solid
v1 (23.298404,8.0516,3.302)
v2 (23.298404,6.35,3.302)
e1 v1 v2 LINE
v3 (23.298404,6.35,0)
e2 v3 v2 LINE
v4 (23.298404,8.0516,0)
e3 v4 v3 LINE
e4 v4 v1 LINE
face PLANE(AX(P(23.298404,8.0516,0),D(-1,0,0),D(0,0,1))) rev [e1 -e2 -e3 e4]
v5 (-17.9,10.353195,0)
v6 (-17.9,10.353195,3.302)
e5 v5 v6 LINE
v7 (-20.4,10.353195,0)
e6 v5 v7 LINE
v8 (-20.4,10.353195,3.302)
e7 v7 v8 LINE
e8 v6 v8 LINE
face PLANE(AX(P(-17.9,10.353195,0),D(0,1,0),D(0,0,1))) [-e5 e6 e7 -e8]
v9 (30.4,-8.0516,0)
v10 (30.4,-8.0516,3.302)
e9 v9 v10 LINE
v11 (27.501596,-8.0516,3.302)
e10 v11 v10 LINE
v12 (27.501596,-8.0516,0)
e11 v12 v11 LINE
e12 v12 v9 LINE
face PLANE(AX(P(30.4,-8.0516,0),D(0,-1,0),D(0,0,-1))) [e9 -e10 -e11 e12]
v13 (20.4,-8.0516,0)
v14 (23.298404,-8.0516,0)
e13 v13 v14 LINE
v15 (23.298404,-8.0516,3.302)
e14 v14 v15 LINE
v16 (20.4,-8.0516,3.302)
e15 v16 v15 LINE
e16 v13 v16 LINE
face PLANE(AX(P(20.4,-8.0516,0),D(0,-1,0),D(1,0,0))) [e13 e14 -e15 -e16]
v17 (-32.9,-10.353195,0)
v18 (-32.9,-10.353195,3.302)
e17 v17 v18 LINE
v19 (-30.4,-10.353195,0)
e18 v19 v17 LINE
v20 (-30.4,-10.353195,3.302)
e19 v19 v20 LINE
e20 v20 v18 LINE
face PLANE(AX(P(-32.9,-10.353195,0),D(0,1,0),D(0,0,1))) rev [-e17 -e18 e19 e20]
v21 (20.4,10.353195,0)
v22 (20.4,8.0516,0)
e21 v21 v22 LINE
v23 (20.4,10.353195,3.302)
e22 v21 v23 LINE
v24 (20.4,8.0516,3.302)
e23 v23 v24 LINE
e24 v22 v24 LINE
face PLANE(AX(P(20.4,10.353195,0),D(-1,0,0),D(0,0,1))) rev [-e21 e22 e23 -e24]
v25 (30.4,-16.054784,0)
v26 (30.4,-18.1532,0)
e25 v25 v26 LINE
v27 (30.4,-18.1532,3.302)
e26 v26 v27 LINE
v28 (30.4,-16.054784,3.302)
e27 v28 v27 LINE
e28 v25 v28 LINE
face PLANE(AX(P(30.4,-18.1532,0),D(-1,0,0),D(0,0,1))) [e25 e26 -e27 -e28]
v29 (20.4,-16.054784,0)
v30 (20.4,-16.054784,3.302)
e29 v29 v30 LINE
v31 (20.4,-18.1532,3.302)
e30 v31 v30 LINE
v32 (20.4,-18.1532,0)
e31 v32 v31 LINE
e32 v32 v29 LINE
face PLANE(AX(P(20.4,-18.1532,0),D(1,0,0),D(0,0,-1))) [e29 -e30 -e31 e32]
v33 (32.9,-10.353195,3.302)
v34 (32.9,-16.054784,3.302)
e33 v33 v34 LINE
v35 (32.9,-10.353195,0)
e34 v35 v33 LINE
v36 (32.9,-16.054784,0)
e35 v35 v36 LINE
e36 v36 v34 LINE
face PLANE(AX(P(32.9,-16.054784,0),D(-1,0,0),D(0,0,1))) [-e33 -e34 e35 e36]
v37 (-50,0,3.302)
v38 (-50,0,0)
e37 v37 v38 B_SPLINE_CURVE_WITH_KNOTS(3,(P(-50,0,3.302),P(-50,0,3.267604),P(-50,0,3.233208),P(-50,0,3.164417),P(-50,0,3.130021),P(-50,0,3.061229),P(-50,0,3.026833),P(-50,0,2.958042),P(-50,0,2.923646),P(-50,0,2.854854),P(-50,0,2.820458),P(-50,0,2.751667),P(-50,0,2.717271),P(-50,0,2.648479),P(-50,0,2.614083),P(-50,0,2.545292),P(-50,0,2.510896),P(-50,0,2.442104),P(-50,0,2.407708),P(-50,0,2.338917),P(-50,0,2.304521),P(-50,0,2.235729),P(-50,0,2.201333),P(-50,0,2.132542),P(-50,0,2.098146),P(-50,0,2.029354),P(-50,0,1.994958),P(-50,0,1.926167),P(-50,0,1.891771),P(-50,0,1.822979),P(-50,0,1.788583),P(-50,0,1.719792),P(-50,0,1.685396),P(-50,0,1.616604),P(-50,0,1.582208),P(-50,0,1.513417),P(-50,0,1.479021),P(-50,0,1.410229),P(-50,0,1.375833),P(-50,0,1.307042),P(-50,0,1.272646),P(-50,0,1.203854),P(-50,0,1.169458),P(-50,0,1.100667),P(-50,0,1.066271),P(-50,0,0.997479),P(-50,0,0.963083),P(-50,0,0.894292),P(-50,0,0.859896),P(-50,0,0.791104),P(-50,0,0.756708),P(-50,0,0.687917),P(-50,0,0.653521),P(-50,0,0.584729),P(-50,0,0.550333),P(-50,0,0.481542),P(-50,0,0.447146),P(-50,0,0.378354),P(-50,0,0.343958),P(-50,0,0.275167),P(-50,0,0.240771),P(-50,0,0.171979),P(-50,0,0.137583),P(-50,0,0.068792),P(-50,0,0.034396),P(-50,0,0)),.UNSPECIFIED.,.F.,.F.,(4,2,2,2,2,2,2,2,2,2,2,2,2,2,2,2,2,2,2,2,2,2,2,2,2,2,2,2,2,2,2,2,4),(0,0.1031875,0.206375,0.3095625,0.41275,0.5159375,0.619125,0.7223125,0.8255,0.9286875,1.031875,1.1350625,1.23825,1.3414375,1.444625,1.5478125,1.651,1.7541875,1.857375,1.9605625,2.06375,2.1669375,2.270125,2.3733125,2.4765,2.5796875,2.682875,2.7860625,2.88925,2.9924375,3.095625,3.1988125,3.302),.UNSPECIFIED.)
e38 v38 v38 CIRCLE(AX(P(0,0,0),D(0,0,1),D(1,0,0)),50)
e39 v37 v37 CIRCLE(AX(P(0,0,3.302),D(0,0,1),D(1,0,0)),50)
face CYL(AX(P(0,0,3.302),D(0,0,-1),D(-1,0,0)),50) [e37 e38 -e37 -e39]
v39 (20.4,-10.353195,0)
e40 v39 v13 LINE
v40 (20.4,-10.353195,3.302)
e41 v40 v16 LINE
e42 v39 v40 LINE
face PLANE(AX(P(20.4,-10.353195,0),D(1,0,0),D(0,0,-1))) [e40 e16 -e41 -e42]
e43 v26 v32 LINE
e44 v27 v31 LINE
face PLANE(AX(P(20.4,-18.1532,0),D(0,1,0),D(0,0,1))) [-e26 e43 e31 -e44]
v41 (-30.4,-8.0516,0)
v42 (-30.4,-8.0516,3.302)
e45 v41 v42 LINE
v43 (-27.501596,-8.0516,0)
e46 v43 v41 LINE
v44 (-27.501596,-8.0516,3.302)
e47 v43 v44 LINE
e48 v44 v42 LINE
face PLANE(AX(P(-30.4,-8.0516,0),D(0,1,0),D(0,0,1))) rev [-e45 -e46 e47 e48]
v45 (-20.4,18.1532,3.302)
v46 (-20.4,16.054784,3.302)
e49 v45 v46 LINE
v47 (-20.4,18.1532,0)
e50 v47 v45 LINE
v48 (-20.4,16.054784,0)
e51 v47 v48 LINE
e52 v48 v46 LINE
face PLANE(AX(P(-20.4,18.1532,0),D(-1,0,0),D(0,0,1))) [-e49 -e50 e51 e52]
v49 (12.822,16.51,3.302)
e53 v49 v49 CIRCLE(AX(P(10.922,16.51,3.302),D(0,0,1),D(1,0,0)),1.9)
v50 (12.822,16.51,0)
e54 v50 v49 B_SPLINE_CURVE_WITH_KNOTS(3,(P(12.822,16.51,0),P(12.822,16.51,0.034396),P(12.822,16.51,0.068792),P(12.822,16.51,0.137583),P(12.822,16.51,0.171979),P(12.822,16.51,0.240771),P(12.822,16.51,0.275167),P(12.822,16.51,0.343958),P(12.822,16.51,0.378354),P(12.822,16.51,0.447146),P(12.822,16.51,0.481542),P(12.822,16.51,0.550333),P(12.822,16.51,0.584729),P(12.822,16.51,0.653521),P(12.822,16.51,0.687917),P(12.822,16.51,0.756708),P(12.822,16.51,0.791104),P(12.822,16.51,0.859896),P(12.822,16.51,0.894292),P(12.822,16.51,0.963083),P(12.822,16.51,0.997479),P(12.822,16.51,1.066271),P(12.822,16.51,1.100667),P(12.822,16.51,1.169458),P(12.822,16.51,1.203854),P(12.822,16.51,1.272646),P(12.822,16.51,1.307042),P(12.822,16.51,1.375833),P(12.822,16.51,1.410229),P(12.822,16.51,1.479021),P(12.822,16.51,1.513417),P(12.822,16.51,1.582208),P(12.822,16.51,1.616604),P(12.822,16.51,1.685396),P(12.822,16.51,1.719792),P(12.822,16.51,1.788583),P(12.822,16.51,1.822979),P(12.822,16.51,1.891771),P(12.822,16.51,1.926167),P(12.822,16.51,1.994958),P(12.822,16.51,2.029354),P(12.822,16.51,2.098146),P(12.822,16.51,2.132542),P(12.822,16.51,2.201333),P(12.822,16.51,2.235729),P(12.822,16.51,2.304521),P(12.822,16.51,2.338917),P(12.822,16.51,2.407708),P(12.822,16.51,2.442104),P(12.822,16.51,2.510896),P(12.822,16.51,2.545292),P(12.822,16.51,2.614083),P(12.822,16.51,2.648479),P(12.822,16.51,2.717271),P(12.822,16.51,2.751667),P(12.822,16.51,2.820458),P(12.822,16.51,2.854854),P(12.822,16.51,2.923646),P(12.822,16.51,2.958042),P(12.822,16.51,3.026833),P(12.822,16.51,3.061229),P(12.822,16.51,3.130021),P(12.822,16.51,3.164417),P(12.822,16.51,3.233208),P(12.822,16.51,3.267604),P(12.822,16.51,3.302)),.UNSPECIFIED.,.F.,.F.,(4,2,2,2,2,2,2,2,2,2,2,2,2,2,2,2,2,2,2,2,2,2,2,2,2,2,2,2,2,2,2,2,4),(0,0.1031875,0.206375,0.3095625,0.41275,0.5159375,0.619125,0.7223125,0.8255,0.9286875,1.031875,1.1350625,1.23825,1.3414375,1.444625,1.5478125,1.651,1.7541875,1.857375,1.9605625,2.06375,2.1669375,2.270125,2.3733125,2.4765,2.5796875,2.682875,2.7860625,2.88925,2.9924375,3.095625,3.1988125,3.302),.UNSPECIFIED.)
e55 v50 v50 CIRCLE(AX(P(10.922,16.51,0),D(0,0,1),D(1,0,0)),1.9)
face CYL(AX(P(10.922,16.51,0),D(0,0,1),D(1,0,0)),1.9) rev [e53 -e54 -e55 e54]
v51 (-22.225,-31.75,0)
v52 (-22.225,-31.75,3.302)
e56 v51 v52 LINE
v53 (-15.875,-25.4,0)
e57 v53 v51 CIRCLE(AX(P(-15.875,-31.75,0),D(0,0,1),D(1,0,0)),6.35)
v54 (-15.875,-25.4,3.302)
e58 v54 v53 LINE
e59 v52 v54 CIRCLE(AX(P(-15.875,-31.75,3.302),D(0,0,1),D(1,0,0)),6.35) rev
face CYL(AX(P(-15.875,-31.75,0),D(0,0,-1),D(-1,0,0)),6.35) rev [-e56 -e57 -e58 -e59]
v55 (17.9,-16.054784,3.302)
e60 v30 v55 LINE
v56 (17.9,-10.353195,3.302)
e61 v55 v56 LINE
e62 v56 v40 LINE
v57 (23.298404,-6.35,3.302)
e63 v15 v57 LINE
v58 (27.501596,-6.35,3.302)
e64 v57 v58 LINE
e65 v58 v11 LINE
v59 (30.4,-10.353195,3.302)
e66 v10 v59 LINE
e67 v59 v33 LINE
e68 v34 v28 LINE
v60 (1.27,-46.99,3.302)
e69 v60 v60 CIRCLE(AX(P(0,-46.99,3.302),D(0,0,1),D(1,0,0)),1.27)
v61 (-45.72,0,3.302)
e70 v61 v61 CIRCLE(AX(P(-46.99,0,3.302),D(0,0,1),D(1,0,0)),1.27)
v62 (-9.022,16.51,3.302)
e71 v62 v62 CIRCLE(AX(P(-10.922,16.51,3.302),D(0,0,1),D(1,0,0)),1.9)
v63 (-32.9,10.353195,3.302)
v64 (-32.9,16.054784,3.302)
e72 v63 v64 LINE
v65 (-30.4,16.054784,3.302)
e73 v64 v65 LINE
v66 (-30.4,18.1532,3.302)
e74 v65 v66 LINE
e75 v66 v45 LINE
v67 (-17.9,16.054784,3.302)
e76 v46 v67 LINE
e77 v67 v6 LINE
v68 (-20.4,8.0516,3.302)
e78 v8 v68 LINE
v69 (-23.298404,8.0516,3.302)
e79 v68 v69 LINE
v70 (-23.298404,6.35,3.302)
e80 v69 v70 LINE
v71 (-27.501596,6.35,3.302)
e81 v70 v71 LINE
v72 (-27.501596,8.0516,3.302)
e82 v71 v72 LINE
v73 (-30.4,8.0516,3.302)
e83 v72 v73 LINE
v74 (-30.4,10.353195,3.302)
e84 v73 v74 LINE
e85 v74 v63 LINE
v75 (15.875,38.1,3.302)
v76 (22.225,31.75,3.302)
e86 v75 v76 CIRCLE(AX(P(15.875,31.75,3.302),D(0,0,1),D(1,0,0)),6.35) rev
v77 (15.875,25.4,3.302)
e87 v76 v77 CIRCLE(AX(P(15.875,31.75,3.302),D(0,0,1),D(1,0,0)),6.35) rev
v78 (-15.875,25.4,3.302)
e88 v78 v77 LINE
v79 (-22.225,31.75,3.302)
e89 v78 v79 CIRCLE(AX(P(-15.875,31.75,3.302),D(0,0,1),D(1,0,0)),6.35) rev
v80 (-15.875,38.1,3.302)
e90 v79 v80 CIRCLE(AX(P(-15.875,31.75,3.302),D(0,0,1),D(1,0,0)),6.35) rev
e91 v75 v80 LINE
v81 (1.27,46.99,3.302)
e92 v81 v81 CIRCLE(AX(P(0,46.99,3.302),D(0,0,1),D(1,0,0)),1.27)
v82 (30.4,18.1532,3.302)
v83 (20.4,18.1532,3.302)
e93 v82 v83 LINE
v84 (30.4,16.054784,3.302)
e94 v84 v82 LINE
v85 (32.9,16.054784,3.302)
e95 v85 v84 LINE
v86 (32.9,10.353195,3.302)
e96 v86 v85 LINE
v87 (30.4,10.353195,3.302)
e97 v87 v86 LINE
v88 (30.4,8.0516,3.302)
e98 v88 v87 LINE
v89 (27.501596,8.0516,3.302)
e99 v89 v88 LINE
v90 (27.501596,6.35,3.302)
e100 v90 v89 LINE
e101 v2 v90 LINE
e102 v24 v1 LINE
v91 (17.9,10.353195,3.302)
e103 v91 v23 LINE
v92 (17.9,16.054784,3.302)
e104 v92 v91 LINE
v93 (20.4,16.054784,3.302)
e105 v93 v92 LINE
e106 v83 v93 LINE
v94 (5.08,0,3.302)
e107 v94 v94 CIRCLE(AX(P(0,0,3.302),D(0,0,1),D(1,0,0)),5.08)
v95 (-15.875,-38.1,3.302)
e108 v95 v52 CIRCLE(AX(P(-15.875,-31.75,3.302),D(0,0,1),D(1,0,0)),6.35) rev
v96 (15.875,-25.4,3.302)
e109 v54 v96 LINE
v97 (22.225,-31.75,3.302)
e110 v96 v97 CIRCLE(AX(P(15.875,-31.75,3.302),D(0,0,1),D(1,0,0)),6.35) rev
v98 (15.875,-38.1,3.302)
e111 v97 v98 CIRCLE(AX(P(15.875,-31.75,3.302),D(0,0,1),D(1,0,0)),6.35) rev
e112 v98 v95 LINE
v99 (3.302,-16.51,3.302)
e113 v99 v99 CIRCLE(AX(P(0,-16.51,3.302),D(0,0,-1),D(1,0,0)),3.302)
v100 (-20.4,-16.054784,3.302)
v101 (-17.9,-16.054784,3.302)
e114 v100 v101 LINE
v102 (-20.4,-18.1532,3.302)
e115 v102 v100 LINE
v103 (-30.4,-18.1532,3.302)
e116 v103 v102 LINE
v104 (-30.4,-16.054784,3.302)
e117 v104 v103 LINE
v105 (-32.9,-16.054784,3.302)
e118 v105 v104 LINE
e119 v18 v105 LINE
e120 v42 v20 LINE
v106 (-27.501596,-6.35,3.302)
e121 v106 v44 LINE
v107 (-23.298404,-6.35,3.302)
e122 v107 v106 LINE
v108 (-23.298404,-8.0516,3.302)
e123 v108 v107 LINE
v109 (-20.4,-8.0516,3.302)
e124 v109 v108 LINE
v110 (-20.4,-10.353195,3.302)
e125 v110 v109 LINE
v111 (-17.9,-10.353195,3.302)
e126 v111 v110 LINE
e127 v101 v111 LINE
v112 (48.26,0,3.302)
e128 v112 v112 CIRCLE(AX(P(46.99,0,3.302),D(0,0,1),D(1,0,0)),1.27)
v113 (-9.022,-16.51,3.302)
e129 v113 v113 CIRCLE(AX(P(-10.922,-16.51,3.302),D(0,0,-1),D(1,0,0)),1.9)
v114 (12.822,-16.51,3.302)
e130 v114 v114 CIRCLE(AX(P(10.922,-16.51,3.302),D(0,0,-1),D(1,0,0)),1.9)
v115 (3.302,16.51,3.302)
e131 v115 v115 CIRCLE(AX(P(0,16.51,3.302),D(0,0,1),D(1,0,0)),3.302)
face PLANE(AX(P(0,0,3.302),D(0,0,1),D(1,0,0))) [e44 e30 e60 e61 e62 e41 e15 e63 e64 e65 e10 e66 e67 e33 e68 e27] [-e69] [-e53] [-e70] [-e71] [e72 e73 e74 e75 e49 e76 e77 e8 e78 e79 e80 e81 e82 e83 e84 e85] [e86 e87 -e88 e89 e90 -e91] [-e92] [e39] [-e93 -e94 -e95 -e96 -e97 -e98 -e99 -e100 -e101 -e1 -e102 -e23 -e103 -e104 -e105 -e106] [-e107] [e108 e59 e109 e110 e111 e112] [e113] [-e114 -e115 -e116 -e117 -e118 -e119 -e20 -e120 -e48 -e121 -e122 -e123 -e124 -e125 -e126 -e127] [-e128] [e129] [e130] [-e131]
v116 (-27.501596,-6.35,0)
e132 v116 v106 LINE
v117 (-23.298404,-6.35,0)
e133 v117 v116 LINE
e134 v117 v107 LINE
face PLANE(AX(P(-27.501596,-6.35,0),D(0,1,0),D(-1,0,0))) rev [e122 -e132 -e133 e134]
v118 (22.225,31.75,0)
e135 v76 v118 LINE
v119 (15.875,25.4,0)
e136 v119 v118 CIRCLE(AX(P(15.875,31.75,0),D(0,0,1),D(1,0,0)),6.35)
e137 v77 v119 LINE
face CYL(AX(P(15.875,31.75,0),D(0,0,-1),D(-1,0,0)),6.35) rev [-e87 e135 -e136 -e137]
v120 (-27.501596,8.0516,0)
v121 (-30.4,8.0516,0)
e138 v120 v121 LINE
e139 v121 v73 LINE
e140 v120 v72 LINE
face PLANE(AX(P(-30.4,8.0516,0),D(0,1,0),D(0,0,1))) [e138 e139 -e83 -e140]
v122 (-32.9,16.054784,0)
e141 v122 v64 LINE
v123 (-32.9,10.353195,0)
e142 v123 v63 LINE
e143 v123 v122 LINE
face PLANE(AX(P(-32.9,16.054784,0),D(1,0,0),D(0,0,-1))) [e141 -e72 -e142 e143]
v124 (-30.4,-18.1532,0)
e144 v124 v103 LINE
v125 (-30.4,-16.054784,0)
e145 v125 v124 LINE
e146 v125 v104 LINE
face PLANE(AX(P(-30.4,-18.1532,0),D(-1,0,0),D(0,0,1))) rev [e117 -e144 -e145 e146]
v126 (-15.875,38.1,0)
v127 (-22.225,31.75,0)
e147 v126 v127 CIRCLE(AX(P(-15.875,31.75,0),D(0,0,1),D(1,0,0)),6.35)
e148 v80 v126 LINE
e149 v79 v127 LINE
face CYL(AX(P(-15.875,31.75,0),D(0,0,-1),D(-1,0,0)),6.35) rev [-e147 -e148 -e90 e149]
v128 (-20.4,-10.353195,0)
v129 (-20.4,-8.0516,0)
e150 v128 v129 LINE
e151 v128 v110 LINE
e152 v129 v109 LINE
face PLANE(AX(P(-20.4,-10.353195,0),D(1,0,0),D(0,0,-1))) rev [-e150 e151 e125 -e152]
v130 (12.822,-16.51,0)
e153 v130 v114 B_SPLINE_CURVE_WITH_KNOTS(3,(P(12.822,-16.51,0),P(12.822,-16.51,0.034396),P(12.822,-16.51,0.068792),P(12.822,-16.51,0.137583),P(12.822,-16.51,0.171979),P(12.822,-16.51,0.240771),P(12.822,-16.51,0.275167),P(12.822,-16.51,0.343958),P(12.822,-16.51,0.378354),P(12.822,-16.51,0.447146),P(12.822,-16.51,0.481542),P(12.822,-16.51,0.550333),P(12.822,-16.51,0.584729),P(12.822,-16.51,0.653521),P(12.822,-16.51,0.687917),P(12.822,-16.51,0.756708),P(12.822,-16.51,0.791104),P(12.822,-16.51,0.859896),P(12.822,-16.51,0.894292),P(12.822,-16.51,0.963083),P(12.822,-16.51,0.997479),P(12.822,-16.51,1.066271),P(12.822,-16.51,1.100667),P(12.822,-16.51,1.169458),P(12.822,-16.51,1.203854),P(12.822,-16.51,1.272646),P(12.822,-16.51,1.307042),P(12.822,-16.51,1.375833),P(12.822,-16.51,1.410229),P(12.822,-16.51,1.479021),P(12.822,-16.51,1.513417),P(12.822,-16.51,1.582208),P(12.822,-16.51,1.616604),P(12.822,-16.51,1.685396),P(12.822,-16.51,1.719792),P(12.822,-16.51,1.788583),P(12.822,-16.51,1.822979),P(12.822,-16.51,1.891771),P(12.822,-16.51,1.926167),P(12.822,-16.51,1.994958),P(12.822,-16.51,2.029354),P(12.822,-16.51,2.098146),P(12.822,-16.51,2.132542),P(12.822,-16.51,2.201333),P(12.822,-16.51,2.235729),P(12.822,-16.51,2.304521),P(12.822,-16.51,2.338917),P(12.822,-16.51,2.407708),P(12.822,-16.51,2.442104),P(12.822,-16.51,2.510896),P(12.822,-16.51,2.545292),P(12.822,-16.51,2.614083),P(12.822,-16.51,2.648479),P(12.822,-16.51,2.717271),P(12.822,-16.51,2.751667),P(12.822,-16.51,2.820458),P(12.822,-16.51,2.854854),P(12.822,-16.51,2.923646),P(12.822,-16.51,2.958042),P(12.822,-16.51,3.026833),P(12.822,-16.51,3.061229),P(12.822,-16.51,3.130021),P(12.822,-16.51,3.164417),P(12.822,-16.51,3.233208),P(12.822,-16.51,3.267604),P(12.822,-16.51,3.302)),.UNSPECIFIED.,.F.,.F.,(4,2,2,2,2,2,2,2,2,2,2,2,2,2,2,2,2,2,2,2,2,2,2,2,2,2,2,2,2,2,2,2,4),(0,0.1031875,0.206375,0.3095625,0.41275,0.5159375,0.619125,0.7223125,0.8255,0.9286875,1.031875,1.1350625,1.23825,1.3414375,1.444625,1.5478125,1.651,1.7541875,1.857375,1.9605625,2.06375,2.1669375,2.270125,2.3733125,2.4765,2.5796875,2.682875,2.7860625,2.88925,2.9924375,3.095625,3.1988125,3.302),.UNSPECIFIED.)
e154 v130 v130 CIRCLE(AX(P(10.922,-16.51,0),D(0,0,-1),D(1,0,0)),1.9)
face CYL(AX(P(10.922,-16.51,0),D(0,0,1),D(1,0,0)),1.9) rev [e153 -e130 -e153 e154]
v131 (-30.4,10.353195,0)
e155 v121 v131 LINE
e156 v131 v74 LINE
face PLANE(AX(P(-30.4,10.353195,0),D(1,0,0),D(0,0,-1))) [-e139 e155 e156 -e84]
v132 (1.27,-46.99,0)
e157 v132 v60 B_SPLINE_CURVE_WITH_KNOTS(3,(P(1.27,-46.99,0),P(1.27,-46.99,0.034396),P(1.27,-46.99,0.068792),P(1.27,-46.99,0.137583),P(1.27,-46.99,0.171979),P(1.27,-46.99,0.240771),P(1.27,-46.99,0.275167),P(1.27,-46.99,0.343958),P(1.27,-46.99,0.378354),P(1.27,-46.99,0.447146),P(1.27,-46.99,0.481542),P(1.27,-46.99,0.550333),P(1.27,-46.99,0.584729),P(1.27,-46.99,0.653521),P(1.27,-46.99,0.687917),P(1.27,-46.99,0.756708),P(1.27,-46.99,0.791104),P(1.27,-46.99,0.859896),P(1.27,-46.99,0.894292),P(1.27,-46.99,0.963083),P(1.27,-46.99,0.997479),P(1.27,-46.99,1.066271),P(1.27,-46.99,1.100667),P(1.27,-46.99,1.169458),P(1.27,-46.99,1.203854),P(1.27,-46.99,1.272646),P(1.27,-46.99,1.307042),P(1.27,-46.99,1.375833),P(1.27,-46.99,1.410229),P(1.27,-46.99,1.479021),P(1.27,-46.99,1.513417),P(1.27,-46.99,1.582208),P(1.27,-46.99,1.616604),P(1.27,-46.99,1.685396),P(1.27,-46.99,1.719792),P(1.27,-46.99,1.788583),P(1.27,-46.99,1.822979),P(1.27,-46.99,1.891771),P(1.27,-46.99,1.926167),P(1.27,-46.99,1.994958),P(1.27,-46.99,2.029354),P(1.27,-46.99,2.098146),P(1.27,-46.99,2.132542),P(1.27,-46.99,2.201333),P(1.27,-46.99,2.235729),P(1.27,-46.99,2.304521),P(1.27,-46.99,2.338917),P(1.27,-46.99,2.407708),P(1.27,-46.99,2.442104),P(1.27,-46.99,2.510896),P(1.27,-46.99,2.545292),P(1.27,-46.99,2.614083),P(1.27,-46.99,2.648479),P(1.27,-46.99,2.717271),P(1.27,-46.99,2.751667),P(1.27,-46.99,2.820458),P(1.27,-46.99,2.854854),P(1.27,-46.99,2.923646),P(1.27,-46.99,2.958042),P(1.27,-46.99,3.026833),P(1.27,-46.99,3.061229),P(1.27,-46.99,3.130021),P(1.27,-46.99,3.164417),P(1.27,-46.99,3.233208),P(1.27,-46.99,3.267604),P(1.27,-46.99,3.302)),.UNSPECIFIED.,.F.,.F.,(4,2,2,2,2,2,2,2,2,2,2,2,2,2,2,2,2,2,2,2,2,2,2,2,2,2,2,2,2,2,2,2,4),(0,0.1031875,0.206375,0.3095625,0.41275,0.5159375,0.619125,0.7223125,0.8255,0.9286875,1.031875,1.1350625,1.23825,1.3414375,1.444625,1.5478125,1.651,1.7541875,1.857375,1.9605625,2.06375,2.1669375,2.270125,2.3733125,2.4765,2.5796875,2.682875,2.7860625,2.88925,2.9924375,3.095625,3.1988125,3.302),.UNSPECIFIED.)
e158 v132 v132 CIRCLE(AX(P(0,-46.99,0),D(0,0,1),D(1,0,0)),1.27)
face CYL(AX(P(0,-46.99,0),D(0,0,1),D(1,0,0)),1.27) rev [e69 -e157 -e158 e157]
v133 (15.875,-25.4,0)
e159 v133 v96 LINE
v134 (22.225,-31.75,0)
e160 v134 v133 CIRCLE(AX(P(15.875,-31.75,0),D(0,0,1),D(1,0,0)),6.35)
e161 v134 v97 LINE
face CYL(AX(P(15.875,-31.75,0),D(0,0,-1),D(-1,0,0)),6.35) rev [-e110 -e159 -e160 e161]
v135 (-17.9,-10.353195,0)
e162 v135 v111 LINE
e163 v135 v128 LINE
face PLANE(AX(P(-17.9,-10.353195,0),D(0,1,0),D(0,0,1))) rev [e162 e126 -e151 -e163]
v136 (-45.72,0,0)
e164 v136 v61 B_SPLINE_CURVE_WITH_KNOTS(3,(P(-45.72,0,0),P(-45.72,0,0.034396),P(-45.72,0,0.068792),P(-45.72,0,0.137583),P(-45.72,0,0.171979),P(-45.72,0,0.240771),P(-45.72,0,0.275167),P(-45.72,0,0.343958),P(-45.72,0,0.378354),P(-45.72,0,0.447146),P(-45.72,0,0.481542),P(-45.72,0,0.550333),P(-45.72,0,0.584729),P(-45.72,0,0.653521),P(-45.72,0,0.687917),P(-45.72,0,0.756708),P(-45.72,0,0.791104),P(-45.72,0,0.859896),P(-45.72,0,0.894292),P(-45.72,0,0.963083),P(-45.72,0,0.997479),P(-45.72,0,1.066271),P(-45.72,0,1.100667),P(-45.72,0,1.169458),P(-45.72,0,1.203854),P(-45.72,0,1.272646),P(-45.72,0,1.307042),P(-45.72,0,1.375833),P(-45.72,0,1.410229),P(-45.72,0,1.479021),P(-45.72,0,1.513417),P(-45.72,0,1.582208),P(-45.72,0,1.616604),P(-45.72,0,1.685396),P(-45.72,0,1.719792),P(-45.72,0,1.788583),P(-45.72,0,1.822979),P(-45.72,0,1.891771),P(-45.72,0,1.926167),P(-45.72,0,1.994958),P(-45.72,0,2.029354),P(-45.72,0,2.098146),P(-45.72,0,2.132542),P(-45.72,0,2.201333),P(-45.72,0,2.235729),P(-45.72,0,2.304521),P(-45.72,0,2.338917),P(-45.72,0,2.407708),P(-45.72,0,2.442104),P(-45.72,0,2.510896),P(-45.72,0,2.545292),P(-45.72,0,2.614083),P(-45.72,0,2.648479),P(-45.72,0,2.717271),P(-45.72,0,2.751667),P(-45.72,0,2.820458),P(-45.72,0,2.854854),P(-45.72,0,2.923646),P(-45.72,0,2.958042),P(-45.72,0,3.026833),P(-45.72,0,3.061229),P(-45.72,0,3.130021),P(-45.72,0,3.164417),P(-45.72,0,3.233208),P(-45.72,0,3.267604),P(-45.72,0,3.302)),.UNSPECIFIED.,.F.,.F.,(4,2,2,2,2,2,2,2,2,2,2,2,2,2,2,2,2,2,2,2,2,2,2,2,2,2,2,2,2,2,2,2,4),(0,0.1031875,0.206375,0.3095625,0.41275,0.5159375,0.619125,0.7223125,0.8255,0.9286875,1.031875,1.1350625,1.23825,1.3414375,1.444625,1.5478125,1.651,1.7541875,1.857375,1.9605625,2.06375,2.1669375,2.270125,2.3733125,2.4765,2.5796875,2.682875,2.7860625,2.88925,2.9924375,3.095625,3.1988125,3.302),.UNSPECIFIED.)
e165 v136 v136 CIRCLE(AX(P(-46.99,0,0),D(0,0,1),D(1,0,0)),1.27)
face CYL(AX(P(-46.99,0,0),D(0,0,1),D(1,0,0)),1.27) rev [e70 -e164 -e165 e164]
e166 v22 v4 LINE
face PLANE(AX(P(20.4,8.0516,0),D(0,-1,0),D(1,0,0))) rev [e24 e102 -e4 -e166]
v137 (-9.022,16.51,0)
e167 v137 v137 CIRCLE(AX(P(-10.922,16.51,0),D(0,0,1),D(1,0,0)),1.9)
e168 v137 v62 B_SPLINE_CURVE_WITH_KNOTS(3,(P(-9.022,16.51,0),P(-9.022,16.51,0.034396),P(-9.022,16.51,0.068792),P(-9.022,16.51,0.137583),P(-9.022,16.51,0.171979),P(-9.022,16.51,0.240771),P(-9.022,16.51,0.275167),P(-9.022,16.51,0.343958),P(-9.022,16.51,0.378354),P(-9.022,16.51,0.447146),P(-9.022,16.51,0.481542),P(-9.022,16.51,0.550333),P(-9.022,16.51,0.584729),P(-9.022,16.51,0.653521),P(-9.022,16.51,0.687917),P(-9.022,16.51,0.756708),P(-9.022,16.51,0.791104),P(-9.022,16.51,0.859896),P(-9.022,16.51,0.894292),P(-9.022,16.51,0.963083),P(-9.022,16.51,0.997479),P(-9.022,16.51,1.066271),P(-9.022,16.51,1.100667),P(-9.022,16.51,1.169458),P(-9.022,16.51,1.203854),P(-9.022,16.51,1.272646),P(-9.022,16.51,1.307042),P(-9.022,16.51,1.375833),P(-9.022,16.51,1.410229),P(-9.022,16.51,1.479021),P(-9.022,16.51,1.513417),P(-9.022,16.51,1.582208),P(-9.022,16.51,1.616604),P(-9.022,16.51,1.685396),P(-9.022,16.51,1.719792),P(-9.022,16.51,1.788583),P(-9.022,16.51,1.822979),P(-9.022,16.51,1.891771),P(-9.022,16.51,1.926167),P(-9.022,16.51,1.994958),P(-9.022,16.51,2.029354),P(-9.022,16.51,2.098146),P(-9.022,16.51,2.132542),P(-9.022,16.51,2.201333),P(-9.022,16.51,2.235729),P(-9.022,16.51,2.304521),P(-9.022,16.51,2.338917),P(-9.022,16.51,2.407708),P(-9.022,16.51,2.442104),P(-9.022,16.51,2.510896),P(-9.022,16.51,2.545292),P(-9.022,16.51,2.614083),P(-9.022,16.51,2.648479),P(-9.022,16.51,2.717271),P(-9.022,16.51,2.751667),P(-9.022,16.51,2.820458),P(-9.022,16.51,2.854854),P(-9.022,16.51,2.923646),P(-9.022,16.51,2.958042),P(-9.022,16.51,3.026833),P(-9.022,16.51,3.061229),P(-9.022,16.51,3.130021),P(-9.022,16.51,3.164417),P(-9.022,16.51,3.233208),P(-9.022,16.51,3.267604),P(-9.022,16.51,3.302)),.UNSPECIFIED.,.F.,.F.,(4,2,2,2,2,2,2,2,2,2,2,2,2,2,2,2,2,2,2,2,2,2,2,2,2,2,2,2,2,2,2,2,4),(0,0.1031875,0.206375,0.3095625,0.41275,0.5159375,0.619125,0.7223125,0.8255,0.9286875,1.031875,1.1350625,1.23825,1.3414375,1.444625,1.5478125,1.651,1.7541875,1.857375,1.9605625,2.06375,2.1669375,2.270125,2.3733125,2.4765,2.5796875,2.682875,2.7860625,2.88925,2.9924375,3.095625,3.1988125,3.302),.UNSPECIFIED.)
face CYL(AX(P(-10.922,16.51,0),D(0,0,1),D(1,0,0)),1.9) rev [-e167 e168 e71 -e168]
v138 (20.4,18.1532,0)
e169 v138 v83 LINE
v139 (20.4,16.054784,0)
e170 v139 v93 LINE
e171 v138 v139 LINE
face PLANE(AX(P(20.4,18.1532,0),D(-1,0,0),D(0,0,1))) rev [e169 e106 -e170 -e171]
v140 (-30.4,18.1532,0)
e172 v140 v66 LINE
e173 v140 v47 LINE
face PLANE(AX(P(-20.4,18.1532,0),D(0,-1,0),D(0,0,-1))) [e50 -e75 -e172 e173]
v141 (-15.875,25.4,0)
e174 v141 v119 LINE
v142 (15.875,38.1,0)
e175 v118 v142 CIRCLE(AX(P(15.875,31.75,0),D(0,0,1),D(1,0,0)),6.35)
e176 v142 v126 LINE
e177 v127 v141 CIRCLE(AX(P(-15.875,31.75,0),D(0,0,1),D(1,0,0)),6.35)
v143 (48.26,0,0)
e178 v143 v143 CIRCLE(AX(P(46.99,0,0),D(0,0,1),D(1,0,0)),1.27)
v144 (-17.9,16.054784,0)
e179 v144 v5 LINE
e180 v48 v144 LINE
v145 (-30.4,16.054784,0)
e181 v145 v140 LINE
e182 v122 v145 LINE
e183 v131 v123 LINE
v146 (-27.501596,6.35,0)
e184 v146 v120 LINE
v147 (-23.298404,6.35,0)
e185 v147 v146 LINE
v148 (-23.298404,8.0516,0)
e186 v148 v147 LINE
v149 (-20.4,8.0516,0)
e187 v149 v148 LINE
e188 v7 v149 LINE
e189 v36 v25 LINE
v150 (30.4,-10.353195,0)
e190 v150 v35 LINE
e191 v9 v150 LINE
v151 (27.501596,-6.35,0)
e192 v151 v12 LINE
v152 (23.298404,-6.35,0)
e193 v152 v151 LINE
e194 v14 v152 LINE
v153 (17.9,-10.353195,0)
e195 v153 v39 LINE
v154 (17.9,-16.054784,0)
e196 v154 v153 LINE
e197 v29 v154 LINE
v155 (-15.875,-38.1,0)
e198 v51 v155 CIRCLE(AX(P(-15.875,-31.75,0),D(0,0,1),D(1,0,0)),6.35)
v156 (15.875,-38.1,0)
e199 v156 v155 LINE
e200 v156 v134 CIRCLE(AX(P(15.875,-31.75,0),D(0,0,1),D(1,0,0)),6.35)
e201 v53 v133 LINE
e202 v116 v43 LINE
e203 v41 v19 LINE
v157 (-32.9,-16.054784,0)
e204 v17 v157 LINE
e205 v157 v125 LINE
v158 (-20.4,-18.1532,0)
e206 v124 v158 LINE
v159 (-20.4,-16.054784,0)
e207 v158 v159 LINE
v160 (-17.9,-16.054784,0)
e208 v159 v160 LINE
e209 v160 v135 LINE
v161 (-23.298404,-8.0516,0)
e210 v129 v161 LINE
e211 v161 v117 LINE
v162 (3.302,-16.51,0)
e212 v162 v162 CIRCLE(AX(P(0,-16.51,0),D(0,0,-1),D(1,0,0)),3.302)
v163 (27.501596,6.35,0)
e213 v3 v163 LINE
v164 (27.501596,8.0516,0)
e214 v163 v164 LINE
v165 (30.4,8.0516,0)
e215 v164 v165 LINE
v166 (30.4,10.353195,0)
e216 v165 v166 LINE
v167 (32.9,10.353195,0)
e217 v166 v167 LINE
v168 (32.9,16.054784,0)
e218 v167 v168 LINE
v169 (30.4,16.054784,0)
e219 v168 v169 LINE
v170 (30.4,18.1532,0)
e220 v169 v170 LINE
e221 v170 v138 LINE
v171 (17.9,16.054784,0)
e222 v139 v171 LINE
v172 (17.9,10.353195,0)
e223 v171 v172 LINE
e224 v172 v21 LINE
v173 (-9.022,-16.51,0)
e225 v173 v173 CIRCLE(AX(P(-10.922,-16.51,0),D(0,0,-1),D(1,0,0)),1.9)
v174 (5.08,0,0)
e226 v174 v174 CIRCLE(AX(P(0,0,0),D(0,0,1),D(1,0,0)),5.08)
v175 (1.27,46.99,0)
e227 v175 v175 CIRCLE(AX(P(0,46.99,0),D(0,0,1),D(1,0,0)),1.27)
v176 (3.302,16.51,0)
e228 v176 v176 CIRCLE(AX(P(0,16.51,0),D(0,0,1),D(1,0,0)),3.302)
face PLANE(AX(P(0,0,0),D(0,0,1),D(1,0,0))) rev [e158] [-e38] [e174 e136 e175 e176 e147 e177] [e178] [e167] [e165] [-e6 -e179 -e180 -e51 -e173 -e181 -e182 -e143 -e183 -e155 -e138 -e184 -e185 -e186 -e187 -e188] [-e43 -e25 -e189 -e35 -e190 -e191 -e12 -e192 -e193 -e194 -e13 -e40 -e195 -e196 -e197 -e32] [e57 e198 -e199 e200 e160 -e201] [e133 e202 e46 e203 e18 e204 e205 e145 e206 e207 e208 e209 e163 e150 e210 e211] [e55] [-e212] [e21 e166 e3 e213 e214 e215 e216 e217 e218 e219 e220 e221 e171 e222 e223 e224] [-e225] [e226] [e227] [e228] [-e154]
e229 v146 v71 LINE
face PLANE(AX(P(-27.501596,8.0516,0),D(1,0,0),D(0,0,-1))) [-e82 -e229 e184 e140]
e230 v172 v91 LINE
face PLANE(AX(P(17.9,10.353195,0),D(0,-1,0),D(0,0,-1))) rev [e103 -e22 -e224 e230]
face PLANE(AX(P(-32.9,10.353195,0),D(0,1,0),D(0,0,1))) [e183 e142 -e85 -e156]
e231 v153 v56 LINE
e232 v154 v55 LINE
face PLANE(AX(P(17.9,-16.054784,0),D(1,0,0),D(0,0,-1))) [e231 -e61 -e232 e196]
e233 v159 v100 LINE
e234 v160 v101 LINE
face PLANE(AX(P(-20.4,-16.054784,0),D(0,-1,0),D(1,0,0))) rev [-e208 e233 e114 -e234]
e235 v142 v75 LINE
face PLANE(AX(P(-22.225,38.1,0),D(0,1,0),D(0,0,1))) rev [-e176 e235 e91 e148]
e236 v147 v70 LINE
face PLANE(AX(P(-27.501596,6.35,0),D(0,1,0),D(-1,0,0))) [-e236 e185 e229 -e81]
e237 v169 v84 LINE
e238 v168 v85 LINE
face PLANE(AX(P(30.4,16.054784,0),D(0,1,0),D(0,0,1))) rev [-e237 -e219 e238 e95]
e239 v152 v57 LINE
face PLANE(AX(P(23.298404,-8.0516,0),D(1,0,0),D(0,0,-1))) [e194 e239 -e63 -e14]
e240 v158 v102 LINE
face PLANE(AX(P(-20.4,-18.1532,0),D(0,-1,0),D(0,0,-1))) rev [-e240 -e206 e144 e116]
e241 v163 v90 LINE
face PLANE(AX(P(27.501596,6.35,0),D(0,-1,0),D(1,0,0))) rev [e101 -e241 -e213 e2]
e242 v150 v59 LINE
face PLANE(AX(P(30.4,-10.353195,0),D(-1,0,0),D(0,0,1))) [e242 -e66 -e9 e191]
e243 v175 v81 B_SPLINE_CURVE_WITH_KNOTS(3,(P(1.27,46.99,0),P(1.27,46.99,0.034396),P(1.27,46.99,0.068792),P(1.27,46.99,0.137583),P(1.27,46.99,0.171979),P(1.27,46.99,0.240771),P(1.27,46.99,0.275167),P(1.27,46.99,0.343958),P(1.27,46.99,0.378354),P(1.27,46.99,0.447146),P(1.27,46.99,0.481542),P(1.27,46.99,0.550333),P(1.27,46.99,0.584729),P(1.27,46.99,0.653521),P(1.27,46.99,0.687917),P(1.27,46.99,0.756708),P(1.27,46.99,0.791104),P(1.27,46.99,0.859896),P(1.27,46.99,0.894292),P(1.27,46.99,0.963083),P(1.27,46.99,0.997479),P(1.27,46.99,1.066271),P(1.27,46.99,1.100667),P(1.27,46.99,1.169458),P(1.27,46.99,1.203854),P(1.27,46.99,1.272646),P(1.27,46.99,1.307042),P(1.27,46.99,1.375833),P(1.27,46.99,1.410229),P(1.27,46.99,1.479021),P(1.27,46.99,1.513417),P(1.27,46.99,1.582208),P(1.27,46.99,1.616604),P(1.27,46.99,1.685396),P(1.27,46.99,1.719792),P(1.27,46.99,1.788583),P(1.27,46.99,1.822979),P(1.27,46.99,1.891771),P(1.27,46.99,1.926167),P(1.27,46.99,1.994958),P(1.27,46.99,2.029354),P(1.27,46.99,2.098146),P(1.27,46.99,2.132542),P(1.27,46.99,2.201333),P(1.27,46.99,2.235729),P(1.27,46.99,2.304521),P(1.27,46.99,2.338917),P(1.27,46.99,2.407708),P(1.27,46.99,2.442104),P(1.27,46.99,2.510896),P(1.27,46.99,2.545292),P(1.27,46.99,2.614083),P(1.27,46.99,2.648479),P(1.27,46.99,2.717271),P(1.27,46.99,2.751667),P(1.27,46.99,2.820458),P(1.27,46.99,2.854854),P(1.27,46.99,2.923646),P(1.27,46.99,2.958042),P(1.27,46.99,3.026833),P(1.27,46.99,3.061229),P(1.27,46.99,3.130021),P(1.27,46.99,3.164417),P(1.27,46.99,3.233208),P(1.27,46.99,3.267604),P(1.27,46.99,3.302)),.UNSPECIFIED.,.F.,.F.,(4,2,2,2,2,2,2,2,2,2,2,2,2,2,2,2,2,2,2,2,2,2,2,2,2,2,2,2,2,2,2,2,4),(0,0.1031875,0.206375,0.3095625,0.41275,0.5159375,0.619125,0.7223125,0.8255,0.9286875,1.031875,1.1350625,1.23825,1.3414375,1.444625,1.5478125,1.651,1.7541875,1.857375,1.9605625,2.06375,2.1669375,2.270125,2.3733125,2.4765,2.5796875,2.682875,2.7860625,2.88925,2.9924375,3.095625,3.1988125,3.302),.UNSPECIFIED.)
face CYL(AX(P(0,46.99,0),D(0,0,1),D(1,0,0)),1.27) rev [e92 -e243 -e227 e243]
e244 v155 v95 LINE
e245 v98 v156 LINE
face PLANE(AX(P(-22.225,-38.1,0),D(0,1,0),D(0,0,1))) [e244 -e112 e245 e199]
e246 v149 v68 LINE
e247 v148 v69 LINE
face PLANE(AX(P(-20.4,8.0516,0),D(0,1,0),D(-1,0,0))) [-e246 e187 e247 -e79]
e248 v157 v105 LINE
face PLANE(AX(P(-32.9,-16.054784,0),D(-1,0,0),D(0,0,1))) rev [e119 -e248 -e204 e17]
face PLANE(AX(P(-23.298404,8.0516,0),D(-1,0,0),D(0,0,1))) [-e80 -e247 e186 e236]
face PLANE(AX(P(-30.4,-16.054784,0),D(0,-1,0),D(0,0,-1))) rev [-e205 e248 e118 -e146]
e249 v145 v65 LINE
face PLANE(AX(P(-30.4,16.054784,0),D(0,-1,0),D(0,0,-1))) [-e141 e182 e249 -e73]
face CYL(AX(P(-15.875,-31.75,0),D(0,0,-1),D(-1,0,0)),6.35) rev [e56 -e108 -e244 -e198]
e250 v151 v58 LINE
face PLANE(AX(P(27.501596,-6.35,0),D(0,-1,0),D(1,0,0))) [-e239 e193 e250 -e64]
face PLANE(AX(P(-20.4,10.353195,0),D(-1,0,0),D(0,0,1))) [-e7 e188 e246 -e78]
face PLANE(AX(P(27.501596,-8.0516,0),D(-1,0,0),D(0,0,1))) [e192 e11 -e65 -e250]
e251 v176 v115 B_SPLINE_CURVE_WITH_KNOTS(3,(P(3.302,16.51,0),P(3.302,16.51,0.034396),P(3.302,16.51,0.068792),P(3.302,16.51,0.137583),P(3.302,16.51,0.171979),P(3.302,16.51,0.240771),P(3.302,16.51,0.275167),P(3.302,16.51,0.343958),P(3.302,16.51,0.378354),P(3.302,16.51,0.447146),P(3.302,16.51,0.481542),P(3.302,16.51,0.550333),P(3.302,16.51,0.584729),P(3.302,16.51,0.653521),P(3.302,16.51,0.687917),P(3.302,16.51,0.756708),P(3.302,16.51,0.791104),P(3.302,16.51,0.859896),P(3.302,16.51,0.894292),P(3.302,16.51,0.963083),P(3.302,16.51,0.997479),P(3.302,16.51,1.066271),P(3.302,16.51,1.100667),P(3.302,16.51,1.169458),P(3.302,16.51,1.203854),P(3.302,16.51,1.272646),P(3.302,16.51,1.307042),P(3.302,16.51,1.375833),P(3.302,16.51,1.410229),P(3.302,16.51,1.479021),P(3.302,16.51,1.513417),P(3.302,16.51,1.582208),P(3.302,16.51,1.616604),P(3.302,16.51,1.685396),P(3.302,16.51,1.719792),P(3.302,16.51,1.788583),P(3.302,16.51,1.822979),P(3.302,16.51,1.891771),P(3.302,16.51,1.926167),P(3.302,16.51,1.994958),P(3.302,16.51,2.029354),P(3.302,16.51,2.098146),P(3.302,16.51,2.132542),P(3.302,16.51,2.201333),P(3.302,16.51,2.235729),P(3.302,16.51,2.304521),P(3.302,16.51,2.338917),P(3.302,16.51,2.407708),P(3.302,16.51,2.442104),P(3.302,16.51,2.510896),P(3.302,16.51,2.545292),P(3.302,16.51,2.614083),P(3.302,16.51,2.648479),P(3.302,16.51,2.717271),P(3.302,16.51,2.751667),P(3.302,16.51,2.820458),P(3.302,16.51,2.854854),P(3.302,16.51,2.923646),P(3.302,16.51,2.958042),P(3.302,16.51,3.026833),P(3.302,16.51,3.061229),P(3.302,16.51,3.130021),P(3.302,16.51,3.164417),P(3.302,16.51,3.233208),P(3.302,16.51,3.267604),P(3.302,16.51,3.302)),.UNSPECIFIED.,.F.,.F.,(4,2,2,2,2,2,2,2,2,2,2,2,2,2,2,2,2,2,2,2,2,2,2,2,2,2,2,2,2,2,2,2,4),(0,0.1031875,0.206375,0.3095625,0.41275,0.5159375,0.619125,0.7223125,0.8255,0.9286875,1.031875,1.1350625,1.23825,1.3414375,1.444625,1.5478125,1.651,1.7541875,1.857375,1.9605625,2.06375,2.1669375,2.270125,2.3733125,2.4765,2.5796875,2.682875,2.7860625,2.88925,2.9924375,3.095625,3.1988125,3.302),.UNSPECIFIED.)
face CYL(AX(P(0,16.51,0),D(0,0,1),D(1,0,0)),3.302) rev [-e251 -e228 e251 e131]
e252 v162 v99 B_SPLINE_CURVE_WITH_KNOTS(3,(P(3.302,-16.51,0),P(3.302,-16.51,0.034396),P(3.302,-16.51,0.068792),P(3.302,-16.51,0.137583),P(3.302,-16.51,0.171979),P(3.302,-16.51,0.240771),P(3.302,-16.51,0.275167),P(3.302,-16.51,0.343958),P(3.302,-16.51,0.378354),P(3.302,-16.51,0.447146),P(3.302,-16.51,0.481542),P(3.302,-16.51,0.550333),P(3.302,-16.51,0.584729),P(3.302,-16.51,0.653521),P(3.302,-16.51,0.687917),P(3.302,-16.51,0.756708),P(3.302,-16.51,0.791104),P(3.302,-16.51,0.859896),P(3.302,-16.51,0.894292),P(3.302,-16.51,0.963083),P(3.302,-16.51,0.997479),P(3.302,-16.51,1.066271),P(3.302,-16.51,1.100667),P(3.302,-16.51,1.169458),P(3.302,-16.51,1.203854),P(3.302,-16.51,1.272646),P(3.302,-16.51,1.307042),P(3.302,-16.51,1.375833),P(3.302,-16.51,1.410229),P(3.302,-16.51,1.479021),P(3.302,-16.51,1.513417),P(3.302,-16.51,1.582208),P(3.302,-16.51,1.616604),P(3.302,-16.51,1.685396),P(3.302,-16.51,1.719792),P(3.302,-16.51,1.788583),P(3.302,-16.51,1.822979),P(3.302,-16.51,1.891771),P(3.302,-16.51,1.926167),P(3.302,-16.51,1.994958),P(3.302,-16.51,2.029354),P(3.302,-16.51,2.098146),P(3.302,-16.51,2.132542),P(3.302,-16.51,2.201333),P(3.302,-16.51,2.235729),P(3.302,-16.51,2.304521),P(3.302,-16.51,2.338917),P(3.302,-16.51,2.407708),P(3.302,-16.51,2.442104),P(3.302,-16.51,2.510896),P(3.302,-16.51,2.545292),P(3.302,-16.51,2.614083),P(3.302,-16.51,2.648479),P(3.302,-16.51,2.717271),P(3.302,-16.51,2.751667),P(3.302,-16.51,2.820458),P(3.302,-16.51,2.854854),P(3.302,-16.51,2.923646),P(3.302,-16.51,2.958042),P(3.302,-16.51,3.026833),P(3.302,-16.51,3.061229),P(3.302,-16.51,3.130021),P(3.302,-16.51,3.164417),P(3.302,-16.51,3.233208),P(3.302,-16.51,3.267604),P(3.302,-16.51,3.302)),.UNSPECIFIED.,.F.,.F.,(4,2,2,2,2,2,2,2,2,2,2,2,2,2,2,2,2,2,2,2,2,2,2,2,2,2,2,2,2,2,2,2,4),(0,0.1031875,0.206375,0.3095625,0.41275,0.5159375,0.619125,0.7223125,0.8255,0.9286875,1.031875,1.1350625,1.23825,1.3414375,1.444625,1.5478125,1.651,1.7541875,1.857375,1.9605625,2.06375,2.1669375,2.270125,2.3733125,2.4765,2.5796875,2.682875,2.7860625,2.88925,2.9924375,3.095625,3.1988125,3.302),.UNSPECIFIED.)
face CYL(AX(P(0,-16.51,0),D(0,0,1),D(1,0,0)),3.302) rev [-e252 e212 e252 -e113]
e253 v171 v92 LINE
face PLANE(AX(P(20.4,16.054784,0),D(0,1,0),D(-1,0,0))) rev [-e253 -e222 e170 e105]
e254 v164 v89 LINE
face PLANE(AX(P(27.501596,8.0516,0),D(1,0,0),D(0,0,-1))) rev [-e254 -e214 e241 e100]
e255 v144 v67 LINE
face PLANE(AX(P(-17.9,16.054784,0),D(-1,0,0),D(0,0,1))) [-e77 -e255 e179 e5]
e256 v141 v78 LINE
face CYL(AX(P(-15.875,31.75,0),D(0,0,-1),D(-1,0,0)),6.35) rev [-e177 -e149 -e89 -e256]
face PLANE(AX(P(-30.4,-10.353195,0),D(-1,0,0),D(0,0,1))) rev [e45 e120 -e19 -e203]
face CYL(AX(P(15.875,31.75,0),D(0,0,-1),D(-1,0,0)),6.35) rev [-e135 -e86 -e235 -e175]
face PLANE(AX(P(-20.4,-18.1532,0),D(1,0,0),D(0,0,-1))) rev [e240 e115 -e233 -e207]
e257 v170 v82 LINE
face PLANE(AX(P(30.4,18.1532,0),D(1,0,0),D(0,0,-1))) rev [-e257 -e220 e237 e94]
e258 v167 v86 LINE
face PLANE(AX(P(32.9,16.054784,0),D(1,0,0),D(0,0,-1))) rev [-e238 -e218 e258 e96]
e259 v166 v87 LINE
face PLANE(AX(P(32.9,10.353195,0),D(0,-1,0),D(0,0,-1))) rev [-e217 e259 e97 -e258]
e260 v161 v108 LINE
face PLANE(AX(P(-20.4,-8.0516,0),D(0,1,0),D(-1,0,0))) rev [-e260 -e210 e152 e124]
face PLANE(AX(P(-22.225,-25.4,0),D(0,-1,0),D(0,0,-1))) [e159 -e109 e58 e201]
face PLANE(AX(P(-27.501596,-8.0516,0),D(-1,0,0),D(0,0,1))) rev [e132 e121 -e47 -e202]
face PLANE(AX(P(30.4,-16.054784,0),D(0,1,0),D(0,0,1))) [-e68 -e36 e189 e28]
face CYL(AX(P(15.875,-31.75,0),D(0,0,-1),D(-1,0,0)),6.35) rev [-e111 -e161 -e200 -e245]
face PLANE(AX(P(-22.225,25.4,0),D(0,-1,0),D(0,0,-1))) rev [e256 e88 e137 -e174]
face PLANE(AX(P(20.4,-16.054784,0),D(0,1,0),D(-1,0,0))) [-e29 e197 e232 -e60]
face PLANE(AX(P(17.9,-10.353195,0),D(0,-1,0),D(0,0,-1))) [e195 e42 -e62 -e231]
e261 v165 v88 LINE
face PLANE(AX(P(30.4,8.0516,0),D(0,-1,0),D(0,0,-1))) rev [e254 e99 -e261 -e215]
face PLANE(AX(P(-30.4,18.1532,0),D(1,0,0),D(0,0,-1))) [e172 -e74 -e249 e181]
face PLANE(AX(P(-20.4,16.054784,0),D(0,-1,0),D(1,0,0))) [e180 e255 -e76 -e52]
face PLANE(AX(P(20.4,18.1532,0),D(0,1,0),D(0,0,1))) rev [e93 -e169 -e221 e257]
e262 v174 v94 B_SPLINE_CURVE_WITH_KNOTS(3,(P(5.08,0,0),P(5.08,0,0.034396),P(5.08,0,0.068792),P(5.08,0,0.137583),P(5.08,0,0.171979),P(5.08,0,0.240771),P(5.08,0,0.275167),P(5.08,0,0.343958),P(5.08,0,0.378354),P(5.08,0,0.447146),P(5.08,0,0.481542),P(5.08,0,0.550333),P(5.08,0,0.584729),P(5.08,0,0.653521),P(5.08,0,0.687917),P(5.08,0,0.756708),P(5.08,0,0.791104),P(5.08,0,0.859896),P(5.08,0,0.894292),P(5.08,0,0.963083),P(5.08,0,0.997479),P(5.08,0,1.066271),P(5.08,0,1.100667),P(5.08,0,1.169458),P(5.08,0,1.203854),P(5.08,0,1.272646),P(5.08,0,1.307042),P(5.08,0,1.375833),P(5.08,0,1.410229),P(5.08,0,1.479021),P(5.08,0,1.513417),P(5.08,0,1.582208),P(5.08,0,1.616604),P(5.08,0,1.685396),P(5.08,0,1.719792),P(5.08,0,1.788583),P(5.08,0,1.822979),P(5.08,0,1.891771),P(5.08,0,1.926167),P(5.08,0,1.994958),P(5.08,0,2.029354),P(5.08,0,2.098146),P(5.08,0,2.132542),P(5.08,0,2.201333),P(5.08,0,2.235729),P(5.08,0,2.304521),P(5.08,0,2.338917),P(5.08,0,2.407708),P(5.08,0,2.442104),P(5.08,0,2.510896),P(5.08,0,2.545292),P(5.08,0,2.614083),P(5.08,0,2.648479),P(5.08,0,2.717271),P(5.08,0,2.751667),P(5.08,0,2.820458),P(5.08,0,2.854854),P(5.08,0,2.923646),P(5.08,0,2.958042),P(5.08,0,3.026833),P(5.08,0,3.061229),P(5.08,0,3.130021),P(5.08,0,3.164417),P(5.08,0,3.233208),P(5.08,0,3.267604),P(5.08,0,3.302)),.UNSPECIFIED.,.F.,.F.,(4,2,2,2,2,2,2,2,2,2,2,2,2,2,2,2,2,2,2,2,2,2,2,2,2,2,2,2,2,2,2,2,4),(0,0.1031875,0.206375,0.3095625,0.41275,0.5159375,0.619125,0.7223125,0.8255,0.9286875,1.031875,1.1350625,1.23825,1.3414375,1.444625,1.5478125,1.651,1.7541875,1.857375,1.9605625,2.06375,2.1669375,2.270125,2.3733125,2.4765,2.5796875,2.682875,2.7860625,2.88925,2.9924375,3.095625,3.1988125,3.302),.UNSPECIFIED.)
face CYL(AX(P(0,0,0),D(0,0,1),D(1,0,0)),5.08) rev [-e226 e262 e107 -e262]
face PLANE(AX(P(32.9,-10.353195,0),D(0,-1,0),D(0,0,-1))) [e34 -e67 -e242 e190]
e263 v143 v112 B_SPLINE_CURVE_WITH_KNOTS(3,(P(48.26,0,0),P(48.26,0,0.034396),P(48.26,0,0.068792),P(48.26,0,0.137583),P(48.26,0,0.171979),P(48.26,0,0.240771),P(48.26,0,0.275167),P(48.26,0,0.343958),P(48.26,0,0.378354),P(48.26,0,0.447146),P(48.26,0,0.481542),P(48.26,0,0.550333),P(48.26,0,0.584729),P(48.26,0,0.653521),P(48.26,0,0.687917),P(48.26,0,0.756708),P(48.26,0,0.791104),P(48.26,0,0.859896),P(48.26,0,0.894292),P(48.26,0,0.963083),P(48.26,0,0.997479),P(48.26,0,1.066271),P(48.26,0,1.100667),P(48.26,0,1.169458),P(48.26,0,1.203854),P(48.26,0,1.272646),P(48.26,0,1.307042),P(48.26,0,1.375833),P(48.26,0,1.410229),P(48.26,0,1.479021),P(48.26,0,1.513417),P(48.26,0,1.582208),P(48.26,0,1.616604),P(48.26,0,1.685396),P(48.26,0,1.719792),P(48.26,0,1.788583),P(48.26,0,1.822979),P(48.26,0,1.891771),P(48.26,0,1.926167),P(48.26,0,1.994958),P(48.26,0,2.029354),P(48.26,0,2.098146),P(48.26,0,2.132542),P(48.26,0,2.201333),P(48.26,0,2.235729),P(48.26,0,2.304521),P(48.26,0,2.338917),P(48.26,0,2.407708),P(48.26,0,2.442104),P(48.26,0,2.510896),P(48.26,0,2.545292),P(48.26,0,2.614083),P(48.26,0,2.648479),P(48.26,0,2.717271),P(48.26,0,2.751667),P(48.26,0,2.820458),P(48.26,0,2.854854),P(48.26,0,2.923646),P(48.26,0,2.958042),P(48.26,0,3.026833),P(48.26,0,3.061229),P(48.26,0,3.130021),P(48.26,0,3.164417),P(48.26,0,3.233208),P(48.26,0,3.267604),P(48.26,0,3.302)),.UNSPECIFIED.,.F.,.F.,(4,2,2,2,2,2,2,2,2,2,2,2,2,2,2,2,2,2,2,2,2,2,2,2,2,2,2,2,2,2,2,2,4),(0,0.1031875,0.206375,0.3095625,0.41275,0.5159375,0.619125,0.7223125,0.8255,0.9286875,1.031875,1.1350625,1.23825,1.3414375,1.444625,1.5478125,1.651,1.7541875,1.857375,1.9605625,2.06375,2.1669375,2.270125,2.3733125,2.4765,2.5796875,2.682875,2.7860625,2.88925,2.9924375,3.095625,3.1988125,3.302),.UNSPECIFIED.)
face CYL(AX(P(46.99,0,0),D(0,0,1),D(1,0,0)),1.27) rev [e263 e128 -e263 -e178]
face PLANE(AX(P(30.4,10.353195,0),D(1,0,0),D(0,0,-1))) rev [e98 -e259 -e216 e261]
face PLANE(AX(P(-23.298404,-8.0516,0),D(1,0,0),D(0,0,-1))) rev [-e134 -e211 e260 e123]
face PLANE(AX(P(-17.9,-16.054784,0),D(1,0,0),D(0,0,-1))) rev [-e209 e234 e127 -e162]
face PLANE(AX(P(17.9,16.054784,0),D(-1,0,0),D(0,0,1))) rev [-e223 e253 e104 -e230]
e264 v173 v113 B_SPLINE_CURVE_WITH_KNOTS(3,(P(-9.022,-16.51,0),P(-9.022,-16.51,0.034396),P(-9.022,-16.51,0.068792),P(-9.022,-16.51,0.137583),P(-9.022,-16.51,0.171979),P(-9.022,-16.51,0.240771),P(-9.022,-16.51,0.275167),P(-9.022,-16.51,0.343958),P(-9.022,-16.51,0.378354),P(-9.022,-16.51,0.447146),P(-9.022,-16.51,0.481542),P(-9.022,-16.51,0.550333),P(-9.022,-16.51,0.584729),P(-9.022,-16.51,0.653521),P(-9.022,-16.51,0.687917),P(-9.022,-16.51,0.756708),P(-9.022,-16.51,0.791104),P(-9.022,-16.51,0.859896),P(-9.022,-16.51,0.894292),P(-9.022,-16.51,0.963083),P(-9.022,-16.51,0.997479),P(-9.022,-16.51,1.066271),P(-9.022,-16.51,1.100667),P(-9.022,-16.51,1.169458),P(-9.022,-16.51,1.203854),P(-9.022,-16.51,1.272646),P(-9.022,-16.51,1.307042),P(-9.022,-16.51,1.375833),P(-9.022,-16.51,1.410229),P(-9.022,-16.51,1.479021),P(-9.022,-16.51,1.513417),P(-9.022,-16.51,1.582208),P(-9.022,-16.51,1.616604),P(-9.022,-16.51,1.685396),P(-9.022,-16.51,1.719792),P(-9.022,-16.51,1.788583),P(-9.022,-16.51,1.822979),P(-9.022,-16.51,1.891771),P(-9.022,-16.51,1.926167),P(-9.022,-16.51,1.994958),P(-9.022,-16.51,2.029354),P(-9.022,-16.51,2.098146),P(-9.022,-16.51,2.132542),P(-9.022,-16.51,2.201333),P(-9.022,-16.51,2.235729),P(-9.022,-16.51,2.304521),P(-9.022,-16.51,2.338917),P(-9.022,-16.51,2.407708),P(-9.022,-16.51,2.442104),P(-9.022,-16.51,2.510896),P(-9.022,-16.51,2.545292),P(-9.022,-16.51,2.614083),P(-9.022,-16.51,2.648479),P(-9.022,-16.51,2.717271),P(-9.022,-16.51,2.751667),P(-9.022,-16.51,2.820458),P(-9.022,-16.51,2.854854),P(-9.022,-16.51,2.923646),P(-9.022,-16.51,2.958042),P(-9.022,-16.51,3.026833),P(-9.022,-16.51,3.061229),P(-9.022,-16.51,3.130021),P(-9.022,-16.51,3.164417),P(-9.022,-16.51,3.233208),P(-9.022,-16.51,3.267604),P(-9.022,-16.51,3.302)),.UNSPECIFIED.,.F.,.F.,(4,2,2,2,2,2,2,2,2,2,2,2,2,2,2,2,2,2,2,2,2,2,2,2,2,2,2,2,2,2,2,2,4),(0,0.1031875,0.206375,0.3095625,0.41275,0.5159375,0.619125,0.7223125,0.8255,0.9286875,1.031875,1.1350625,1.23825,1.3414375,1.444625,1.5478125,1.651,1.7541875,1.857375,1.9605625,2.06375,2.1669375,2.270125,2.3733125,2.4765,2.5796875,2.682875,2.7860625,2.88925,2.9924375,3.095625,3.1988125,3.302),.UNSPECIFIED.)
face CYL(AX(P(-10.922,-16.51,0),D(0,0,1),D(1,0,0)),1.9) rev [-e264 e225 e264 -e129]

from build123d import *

# Parameters (mm, degrees)
SKETCH_1_R           = 50
EXTRUDE_1_DEPTH      = 3.302
SKETCH_4_R           = 5.08
CUT_EXTRUDE_3_DEPTH  = 71.787733429
SKETCH_7_R           = 1.27
CUT_EXTRUDE_6_DEPTH  = 71.787733429
SKETCH3_R            = 3.302
SKETCH3_R_2          = 1.9
CUT_EXTRUDE1_DEPTH   = 71.787733429
CUT_EXTRUDE4_DEPTH   = 71.787733429
MIRROR5_COPY_1_DEPTH = 71.787733429
SKETCH11_W           = 44.45
SKETCH11_H           = 12.7
CUT_EXTRUDE5_DEPTH   = 71.787733429
FILLET1_R            = 6.35
FILLET1_OF_MIRROR6_R = 6.35


with BuildPart() as part:
    # 草图1 → 凸台-拉伸1 (new body)
    with BuildSketch(Plane.XY):
        with Locations(Location((0, 0, 0), (0, 0, 180))):
            Circle(SKETCH_1_R)
    extrude(amount=EXTRUDE_1_DEPTH)

    # 草图4 → 切除-拉伸3 (cut, through all)
    with BuildSketch(Plane.XY.offset(3.302)):
        Circle(SKETCH_4_R)
    extrude(amount=-CUT_EXTRUDE_3_DEPTH, mode=Mode.SUBTRACT)

    # 草图7 → 切除-拉伸6 (cut, through all)
    with BuildSketch(Plane.XY.offset(3.302)):
        with Locations((0, 46.99)):
            Circle(SKETCH_7_R)
        with Locations((46.99, 0)):
            Circle(SKETCH_7_R)
        with Locations((0, -46.99)):
            Circle(SKETCH_7_R)
        with Locations((-46.99, 0)):
            Circle(SKETCH_7_R)
    extrude(amount=-CUT_EXTRUDE_6_DEPTH, mode=Mode.SUBTRACT)

    # Sketch3 → Cut-Extrude1 (cut, through all)
    with BuildSketch(Plane.XY.offset(3.302)):
        with Locations((0, 16.51)):
            Circle(SKETCH3_R)
        with Locations((10.922, 16.51)):
            Circle(SKETCH3_R_2)
        with Locations((-10.922, 16.51)):
            Circle(SKETCH3_R_2)
    cut_extrude1 = extrude(amount=-CUT_EXTRUDE1_DEPTH, mode=Mode.SUBTRACT)

    # Mirror3: Cut-Extrude1 across plane
    add(cut_extrude1.mirror(Plane.ZX), mode=Mode.SUBTRACT)

    # Sketch10 → Cut-Extrude4 (cut, through all)
    with BuildSketch(Plane.XY.offset(3.302)):
        Polygon((-20.4, -18.153199914), (-30.4, -18.153199914), (-30.4, -16.054784248), (-32.9, -16.054784248), (-32.9, -10.353195448), (-30.4, -10.353195448), (-30.4, -8.051599848), (-27.501596, -8.051599848), (-27.501596, -6.35), (-23.298404, -6.35), (-23.298404, -8.051599848), (-20.4, -8.051599848), (-20.4, -10.353195448), (-17.9, -10.353195448), (-17.9, -16.054784248), (-20.4, -16.054784248), align=None)
    cut_extrude4 = extrude(amount=-CUT_EXTRUDE4_DEPTH, mode=Mode.SUBTRACT)

    # Mirror4: Cut-Extrude4 across plane
    add(cut_extrude4.mirror(Plane.ZX), mode=Mode.SUBTRACT)

    # Mirror5: Cut-Extrude4 across plane
    add(cut_extrude4.mirror(Plane(origin=(0, 0, 0), x_dir=(0, 0, 1), z_dir=(1, 0, 0))), mode=Mode.SUBTRACT)

    # Mirror5 copy 1 sketch → Mirror5 copy 1 (cut, through all)
    with BuildSketch(Plane(origin=(0, 0, 3.302), x_dir=(-1, 0, 0), z_dir=(0, 0, 1))):
        Polygon((-20.4, -18.153199914), (-30.4, -18.153199914), (-30.4, -16.054784248), (-32.9, -16.054784248), (-32.9, -10.353195448), (-30.4, -10.353195448), (-30.4, -8.051599848), (-27.501596, -8.051599848), (-27.501596, -6.35), (-23.298404, -6.35), (-23.298404, -8.051599848), (-20.4, -8.051599848), (-20.4, -10.353195448), (-17.9, -10.353195448), (-17.9, -16.054784248), (-20.4, -16.054784248), align=None)
    extrude(amount=-MIRROR5_COPY_1_DEPTH, mode=Mode.SUBTRACT)

    # Sketch11 → Cut-Extrude5 (cut, through all)
    with BuildSketch(Plane.XY.offset(3.302)):
        with Locations((0, 31.75)):
            Rectangle(SKETCH11_W, SKETCH11_H)
    cut_extrude5 = extrude(amount=-CUT_EXTRUDE5_DEPTH, mode=Mode.SUBTRACT)

    # Fillet1
    fillet1_edges = [part.edges().sort_by_distance(p)[0] for p in [
        (22.225, 25.4, 1.651),
        (22.225, 38.1, 1.651),
        (-22.225, 38.1, 1.651),
        (-22.225, 25.4, 1.651),
    ]]
    fillet(fillet1_edges, radius=FILLET1_R - 0.0001)  # a hair under: the kernel refuses the full size

    # Mirror6: Cut-Extrude5 across plane
    add(cut_extrude5.mirror(Plane.ZX), mode=Mode.SUBTRACT)

    # Fillet1 of Mirror6
    fillet1_of_mirror6_edges = [part.edges().sort_by_distance(p)[0] for p in [
        (22.225, -25.4, 1.651),
        (22.225, -38.1, 1.651),
        (-22.225, -38.1, 1.651),
        (-22.225, -25.4, 1.651),
    ]]
    fillet(fillet1_of_mirror6_edges, radius=FILLET1_OF_MIRROR6_R - 0.0001)  # a hair under: the kernel refuses the full size


solid = part.part
